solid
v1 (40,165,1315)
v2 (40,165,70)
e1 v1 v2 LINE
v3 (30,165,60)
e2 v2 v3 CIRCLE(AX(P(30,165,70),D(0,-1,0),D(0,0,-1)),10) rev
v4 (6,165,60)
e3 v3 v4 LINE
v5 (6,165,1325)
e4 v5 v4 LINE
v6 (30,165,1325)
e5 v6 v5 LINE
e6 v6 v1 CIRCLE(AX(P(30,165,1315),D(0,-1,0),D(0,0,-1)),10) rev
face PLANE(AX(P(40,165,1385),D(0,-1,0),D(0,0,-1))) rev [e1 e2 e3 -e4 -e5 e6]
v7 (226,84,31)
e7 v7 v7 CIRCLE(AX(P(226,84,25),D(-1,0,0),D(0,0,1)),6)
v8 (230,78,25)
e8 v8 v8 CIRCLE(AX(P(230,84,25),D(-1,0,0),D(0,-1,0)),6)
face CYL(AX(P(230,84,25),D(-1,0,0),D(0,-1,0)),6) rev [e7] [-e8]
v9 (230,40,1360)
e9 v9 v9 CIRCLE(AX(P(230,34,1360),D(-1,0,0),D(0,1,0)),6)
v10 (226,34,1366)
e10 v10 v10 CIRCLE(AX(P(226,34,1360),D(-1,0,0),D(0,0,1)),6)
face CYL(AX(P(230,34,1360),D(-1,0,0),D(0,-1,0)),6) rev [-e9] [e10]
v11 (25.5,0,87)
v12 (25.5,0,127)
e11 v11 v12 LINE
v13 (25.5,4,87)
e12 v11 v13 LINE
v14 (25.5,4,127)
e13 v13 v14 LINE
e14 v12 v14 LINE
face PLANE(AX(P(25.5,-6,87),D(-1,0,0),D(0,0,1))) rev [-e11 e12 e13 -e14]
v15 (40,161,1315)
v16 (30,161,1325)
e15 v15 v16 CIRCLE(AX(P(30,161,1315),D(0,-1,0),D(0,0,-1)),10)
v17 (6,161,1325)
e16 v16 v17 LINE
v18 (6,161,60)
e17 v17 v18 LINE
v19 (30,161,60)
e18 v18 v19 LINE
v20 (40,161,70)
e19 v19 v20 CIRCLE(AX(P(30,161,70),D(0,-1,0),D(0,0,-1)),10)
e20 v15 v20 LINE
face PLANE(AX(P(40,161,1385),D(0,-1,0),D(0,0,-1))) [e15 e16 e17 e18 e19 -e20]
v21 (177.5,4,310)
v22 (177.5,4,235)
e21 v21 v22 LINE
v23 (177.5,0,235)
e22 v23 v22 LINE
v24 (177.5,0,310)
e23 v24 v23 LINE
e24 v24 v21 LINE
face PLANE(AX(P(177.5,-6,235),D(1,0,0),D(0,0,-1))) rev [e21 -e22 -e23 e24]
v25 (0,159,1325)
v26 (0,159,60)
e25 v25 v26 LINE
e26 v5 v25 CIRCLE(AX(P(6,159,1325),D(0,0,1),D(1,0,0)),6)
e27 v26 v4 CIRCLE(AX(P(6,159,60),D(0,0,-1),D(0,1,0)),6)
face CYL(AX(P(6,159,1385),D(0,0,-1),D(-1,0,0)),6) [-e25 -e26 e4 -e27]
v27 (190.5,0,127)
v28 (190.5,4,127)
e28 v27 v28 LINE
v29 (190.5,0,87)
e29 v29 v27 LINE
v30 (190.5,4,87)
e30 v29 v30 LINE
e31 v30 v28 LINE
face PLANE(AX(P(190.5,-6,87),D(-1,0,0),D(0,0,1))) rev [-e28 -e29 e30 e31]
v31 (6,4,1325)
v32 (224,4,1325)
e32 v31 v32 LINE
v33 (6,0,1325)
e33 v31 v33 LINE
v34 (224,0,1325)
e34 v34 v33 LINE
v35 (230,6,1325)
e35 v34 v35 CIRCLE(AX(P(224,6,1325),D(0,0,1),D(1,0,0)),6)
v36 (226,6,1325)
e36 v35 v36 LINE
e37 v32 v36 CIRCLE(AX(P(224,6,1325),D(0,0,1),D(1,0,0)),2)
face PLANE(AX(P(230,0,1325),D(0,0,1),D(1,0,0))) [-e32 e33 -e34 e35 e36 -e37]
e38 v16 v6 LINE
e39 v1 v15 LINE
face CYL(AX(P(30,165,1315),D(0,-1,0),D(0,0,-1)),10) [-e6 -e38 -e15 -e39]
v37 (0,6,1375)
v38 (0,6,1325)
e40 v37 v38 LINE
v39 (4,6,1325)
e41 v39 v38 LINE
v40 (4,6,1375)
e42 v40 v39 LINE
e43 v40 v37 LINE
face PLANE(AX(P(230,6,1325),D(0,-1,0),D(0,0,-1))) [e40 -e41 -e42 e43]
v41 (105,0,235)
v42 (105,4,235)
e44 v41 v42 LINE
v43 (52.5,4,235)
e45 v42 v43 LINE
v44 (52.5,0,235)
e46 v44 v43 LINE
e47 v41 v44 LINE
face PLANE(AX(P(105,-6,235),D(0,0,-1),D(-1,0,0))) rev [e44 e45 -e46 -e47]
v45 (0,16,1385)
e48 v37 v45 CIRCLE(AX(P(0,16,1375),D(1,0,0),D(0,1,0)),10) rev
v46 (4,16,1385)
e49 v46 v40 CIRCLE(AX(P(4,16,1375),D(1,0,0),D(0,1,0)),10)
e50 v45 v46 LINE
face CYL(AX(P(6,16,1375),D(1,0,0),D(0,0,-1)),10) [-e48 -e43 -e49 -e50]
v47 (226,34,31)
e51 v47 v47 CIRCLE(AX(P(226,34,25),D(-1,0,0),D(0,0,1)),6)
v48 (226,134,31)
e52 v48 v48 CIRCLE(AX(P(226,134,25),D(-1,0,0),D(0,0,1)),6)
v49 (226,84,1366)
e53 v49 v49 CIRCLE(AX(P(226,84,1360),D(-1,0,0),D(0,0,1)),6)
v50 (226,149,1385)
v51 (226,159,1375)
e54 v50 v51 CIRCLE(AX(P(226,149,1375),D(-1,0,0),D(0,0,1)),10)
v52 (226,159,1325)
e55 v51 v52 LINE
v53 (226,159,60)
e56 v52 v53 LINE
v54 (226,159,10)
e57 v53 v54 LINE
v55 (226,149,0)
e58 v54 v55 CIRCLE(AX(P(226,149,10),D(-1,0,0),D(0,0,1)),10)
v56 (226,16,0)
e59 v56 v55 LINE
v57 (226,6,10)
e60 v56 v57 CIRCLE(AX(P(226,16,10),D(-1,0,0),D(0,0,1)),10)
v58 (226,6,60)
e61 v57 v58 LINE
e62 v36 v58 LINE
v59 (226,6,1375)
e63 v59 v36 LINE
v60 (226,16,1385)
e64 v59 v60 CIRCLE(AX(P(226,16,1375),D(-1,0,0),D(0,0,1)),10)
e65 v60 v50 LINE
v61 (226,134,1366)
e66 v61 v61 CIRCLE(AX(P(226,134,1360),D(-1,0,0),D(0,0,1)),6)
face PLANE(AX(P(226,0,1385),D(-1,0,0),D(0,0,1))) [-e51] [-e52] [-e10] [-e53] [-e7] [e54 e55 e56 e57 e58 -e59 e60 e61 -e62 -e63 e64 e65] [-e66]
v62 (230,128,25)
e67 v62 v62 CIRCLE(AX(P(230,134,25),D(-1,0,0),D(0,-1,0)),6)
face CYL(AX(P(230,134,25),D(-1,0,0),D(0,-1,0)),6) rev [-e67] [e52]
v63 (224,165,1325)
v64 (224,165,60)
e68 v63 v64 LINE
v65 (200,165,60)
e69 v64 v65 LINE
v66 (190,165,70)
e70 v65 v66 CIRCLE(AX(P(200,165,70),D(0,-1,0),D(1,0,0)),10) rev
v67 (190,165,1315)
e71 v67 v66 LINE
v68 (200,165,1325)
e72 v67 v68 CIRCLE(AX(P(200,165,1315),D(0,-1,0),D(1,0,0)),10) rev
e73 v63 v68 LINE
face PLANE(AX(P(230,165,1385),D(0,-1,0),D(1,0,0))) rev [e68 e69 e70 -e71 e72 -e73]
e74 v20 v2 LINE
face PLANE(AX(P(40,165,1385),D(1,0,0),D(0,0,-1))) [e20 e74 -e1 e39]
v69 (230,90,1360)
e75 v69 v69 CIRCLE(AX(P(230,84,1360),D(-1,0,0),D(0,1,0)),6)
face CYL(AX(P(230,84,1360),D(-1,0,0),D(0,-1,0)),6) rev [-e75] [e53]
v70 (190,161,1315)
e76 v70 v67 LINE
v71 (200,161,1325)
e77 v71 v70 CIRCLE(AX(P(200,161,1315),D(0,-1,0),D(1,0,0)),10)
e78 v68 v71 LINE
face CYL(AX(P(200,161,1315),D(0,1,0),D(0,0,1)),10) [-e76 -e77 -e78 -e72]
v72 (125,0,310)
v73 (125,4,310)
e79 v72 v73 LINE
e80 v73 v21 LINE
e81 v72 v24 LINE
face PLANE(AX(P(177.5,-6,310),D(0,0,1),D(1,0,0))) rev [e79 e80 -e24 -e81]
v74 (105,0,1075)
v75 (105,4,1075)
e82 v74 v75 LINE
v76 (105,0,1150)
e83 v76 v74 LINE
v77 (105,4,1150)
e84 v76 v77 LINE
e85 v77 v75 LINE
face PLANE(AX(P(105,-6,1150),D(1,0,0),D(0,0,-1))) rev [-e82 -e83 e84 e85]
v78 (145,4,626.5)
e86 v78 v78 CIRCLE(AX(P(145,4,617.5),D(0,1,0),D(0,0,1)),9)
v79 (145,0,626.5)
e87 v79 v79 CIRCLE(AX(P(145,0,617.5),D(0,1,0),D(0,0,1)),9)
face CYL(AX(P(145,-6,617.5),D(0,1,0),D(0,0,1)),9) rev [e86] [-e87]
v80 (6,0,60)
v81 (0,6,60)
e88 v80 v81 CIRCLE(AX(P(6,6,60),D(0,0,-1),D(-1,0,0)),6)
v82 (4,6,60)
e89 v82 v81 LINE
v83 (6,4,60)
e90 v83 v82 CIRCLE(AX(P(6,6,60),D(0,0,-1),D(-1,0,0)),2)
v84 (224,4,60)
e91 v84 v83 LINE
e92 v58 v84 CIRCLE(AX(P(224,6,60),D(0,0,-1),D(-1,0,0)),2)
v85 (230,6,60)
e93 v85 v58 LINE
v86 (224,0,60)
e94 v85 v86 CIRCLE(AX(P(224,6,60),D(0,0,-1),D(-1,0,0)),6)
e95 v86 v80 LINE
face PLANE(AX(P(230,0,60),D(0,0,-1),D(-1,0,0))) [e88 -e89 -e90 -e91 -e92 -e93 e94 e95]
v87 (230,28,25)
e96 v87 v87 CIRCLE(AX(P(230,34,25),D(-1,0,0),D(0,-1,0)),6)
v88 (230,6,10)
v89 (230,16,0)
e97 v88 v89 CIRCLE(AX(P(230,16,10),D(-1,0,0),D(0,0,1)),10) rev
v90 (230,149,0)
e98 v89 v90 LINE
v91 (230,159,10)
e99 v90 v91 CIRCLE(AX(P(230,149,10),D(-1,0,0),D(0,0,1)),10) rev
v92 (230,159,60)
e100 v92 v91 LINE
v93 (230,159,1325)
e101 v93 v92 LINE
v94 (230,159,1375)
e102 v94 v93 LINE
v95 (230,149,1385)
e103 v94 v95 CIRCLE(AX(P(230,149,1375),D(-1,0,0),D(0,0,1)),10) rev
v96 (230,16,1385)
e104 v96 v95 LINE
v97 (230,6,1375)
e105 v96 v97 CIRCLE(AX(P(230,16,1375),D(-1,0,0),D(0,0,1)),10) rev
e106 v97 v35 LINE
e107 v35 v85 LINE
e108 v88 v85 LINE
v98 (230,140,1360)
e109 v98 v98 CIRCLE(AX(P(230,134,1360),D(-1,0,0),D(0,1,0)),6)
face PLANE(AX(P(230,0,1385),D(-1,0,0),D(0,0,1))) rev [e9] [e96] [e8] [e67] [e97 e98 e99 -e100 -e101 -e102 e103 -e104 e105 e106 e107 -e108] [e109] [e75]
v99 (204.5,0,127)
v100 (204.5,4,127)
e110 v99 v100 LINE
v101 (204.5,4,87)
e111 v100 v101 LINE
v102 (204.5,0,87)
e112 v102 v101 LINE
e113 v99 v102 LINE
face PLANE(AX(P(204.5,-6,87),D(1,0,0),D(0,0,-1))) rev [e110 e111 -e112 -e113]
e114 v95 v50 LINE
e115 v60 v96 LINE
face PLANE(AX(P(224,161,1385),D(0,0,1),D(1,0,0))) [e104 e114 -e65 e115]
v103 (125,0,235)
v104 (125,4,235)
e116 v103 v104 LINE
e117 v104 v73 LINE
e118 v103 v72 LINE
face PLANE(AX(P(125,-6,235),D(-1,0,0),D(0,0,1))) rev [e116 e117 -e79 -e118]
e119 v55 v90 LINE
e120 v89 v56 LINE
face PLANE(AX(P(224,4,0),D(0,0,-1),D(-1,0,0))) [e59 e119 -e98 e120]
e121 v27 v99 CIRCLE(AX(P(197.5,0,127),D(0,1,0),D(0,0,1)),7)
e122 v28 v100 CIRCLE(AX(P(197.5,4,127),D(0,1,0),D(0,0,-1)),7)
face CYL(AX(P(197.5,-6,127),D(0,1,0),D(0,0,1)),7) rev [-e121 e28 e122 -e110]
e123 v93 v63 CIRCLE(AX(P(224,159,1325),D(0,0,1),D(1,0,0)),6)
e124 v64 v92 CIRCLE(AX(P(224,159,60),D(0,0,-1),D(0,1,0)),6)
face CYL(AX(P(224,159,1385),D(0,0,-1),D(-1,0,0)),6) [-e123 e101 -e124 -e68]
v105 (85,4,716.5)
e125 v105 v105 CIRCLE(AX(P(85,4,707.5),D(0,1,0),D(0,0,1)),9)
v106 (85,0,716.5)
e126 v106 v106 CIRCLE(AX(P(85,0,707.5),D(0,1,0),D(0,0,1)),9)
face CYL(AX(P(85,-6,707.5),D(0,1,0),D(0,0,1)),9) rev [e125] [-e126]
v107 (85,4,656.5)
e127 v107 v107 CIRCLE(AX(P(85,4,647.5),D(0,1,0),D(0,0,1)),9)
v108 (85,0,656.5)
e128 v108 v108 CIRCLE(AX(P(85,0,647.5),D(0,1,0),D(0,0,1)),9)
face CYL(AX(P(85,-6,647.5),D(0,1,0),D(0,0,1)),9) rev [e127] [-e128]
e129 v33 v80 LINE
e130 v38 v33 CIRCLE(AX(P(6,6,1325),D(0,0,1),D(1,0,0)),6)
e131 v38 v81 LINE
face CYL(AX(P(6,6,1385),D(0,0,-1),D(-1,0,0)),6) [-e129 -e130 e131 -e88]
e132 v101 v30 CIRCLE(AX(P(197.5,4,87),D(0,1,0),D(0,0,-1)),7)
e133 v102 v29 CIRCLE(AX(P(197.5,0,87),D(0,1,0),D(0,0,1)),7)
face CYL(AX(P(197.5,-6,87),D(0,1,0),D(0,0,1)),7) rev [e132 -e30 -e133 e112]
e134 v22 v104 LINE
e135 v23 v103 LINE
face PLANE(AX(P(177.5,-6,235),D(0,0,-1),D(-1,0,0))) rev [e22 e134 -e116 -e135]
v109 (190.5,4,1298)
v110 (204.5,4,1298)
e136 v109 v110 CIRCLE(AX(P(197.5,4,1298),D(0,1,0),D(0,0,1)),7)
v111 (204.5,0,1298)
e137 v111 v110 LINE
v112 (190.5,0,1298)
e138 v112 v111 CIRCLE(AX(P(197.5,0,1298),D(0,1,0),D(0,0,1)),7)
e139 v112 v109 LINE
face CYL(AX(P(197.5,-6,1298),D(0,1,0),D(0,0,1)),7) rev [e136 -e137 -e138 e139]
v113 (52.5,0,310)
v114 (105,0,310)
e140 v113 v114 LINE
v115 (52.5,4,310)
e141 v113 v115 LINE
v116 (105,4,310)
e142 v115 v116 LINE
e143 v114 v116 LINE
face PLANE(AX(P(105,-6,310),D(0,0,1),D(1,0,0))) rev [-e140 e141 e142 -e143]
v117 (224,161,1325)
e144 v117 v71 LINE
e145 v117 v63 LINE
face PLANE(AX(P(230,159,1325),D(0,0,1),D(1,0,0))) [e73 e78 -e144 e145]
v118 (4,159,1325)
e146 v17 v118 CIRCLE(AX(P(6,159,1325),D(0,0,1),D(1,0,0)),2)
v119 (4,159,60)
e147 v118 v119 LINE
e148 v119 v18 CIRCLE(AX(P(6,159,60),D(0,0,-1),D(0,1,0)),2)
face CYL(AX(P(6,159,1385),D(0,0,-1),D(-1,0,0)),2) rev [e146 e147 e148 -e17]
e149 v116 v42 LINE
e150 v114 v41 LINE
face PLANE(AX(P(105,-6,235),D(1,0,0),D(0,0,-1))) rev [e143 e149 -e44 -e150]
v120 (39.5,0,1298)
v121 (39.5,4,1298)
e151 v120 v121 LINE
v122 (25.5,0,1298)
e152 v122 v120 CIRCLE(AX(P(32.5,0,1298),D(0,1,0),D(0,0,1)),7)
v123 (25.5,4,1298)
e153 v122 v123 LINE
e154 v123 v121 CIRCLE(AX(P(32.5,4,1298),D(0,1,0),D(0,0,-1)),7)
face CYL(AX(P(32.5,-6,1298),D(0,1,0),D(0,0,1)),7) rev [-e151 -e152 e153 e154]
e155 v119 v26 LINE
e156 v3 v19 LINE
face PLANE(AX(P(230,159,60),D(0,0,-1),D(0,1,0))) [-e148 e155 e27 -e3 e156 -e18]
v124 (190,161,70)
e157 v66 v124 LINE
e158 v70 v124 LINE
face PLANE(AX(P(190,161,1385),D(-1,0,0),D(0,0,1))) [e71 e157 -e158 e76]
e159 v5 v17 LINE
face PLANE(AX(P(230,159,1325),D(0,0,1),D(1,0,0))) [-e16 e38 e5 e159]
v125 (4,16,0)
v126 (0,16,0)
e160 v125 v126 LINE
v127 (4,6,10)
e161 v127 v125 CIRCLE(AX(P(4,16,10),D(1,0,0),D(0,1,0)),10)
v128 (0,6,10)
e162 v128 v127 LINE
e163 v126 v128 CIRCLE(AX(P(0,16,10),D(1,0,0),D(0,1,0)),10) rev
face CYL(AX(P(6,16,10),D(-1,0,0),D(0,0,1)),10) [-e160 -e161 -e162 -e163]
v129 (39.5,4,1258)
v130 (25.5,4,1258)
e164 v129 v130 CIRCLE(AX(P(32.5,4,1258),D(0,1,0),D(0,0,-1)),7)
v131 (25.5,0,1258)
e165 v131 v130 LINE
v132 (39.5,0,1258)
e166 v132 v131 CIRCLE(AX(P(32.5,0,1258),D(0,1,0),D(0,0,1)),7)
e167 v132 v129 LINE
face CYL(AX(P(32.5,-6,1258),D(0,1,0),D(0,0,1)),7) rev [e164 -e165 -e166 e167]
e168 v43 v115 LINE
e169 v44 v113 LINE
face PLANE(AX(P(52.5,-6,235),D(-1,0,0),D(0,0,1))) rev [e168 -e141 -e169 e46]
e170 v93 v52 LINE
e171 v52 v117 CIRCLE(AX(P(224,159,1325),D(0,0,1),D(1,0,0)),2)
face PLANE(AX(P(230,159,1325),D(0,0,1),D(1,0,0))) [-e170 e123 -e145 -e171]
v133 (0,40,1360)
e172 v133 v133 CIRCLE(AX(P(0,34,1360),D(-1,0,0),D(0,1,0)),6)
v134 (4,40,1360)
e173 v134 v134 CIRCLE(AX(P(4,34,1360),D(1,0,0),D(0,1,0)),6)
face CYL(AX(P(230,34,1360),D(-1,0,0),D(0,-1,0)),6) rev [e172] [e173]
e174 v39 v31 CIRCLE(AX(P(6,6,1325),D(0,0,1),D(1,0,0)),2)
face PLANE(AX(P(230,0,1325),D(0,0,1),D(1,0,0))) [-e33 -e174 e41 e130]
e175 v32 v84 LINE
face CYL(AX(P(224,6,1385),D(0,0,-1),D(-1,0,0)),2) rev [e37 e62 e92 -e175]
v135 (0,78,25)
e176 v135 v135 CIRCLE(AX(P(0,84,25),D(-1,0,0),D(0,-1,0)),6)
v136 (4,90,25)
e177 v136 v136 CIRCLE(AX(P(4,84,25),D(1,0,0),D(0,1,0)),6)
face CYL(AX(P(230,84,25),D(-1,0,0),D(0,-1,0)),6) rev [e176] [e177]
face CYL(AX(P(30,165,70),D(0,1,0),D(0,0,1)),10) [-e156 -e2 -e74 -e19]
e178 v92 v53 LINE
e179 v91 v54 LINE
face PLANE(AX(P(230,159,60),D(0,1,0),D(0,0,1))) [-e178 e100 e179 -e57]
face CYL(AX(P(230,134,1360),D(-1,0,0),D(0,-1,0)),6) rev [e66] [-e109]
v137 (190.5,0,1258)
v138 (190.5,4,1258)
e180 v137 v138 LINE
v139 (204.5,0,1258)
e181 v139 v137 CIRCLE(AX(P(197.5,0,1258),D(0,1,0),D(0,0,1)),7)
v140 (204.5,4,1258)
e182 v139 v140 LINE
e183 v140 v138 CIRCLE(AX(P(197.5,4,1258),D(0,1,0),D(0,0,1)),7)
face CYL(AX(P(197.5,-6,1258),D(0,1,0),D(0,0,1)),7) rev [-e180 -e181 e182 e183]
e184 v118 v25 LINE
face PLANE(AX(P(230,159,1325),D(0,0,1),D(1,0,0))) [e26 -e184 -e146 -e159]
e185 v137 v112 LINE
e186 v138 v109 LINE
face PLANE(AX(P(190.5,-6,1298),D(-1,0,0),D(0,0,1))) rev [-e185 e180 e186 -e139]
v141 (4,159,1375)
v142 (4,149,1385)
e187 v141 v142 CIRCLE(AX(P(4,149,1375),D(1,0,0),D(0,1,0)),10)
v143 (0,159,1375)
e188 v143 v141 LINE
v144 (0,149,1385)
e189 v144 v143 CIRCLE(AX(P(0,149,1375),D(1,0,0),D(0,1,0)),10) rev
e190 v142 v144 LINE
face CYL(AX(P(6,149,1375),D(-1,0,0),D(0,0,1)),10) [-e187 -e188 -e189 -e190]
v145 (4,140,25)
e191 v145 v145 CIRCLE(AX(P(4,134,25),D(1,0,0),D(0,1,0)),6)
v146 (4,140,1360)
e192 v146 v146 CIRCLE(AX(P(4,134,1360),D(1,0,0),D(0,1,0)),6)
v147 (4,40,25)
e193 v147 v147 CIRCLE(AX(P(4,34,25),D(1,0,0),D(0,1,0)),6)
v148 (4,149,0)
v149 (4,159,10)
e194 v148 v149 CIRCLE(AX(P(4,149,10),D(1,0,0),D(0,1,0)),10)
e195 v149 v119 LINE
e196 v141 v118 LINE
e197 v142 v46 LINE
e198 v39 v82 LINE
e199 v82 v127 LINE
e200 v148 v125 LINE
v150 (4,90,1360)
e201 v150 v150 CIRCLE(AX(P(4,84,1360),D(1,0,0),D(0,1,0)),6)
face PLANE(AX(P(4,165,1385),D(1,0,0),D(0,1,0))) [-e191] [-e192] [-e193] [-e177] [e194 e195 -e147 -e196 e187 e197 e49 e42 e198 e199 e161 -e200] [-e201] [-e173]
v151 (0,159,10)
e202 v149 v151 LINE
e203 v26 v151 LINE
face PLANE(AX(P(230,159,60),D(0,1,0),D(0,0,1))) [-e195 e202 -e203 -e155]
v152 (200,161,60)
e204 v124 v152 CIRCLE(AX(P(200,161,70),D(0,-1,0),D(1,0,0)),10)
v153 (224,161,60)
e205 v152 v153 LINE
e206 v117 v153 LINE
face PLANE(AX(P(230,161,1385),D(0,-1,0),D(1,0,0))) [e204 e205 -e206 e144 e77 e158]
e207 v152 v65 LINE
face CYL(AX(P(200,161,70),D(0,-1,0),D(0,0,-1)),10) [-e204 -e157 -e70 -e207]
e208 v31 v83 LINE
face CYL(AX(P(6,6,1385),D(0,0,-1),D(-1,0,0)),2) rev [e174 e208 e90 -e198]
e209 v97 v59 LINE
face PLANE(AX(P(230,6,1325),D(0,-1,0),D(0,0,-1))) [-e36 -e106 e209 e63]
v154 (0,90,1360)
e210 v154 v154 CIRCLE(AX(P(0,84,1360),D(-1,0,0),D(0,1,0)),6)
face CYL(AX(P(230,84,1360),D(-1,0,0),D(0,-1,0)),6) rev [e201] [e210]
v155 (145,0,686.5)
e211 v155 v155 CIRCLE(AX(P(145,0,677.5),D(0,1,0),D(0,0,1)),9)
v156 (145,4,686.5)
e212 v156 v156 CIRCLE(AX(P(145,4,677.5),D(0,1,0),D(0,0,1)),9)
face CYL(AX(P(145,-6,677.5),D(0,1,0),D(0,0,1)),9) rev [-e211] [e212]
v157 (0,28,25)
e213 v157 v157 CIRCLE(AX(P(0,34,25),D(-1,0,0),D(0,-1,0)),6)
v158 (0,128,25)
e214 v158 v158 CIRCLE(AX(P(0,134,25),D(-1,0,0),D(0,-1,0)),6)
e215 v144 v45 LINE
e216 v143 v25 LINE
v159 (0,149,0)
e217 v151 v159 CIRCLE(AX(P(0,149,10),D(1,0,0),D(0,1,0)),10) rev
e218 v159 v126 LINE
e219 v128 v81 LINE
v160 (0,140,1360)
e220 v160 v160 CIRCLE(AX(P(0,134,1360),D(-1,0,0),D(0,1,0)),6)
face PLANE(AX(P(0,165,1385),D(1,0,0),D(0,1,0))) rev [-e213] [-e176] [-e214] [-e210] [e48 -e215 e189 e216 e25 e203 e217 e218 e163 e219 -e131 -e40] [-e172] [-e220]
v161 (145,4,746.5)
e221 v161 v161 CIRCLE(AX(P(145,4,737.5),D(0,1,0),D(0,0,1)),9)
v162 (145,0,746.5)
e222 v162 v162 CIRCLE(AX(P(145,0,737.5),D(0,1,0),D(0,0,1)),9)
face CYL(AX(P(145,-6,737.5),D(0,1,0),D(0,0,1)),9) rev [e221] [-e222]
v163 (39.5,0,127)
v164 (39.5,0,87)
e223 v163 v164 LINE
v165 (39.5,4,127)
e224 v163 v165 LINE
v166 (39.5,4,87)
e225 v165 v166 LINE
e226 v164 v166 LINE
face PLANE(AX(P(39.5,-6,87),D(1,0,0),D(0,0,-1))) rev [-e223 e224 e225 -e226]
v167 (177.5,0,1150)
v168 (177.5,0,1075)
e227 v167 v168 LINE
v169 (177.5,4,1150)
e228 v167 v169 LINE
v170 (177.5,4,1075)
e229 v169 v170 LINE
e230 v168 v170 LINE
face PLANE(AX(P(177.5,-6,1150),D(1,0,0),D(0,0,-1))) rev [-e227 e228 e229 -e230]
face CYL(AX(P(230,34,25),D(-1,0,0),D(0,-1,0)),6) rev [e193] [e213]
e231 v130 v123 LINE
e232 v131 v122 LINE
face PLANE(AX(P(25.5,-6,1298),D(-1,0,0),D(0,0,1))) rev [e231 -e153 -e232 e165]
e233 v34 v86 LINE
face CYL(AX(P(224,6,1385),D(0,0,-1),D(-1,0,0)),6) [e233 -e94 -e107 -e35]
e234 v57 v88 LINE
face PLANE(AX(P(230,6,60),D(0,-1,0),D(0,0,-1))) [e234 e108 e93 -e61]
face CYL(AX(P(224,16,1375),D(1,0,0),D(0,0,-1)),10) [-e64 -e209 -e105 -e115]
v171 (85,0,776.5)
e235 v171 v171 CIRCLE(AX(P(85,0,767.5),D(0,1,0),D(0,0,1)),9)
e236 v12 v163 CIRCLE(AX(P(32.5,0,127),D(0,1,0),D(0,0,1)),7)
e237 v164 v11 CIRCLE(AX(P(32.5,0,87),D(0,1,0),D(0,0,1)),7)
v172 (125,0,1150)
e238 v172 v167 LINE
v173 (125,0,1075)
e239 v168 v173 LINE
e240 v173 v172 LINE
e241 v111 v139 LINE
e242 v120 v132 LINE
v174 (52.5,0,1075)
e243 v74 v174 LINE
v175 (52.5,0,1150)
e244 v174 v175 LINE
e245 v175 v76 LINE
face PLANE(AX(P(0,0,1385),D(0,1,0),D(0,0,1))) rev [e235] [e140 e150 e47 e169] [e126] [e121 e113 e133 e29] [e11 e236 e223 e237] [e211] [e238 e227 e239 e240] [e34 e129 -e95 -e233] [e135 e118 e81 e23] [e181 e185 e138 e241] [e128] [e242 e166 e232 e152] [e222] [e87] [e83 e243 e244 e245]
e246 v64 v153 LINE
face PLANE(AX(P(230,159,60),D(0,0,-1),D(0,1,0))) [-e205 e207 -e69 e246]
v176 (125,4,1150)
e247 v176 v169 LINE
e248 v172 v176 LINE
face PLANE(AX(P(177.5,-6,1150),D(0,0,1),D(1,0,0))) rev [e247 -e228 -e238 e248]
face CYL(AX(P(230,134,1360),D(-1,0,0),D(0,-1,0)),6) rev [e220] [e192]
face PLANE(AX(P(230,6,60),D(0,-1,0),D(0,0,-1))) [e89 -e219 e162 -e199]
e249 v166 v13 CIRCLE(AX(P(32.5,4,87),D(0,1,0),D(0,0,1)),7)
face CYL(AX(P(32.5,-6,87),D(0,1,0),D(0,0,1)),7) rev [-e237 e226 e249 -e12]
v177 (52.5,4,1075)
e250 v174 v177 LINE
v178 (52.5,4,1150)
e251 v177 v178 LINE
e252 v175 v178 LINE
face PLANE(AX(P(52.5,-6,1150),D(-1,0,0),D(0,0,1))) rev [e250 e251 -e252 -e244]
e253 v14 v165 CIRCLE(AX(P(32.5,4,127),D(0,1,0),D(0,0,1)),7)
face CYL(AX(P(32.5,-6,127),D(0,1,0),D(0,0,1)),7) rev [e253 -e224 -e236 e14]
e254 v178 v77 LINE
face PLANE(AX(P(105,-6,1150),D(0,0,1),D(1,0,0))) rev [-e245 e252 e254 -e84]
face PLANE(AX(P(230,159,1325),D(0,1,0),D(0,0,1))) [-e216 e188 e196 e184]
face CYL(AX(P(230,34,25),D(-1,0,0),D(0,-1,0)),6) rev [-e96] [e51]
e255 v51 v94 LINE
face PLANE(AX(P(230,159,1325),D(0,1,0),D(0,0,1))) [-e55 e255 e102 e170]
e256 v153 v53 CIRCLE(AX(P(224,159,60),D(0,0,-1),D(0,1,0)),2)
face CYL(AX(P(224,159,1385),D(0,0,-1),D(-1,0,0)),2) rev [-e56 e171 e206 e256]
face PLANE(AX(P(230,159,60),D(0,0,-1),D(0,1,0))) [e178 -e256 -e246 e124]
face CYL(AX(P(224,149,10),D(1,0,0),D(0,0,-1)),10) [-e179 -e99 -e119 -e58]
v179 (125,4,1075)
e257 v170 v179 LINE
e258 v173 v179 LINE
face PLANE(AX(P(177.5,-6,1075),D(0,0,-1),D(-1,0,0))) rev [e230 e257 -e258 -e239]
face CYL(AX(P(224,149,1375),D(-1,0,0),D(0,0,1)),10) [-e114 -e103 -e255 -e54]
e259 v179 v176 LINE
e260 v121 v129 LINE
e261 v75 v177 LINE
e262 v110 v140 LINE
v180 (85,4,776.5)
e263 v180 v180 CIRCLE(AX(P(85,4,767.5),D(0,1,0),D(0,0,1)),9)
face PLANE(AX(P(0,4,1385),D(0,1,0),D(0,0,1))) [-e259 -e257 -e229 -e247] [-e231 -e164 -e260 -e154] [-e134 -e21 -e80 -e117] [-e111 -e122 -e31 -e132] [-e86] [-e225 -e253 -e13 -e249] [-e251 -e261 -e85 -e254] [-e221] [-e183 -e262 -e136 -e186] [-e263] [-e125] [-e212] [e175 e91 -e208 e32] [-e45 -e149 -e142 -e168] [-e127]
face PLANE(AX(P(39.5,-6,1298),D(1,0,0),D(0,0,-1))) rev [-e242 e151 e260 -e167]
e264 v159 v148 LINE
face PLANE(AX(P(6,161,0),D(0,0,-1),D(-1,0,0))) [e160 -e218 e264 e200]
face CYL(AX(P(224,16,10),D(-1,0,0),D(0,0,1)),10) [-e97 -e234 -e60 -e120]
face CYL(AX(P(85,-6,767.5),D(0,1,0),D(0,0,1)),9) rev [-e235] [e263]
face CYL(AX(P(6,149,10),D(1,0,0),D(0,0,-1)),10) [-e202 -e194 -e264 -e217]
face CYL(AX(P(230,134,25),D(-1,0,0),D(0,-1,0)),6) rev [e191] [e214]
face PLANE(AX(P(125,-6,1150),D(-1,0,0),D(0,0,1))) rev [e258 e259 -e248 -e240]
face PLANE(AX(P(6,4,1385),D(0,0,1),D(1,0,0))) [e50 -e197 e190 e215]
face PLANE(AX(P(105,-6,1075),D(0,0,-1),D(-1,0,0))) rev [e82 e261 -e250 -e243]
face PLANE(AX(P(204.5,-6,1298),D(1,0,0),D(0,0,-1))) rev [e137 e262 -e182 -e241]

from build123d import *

# Parameters (mm, degrees)
BASE_FLANGE1_DEPTH = 1385
SKETCH6_W          = 60
SKETCH6_H          = 6
CUT_EXTRUDE1_DEPTH = 1414.63007891
SKETCH7_R          = 6
CUT_EXTRUDE2_DEPTH = 1414.63007891
FILLET1_R          = 10
SKETCH8_R          = 9
SKETCH8_W          = 52.5
SKETCH8_H          = 75
CUT_EXTRUDE3_DEPTH = 10


# Sheet-metal steps are written as plain solids
with BuildPart() as part:
    # Sketch1 → Base-Flange1 (new body)
    with BuildSketch(Plane.XY):
        with BuildLine():
            Line((40, 165), (6, 165))
            ThreePointArc((6, 165), (1.757359313, 163.242640687), (0, 159))
            Line((0, 159), (0, 6))
            ThreePointArc((0, 6), (1.757359313, 1.757359313), (6, 0))
            Line((6, 0), (224, 0))
            ThreePointArc((224, 0), (228.242640687, 1.757359313), (230, 6))
            Line((230, 6), (230, 159))
            ThreePointArc((230, 159), (228.242640687, 163.242640687), (224, 165))
            Line((224, 165), (190, 165))
            Line((190, 165), (190, 161))
            Line((190, 161), (224, 161))
            ThreePointArc((224, 161), (225.414213562, 160.414213562), (226, 159))
            Line((226, 159), (226, 6))
            ThreePointArc((226, 6), (225.414213562, 4.585786438), (224, 4))
            Line((224, 4), (6, 4))
            ThreePointArc((6, 4), (4.585786438, 4.585786438), (4, 6))
            Line((4, 6), (4, 159))
            ThreePointArc((4, 159), (4.585786438, 160.414213562), (6, 161))
            Line((6, 161), (40, 161))
            Line((40, 161), (40, 165))
        make_face()
    extrude(amount=BASE_FLANGE1_DEPTH)

    # Sketch6 → Cut-Extrude1 (cut, through all)
    with BuildSketch(Plane(origin=(0, 0, 0), x_dir=(0, 0, -1), z_dir=(1, 0, 0))):
        with Locations((-30, 162)):
            Rectangle(SKETCH6_W, SKETCH6_H)
        with Locations((-1355, 162)):
            Rectangle(SKETCH6_W, SKETCH6_H)
        with Locations((-1355, 3)):
            Rectangle(SKETCH6_W, SKETCH6_H)
        with Locations((-30, 3)):
            Rectangle(SKETCH6_W, SKETCH6_H)
    extrude(amount=CUT_EXTRUDE1_DEPTH, mode=Mode.SUBTRACT)

    # Sketch7 → Cut-Extrude2 (cut, through all)
    with BuildSketch(Plane.ZY):
        with Locations(Location((25, 134, 0), (0, 0, 270))):
            Circle(SKETCH7_R)
        with Locations(Location((25, 84, 0), (0, 0, 270))):
            Circle(SKETCH7_R)
        with Locations(Location((25, 34, 0), (0, 0, 270))):
            Circle(SKETCH7_R)
        with Locations((1360, 34)):
            Circle(SKETCH7_R)
        with Locations((1360, 84)):
            Circle(SKETCH7_R)
        with Locations((1360, 134)):
            Circle(SKETCH7_R)
    extrude(amount=-CUT_EXTRUDE2_DEPTH, mode=Mode.SUBTRACT)

    # Fillet1
    fillet1_edges = [part.edges().sort_by_distance(p)[0] for p in [
        (190, 163, 1325),
        (40, 163, 1325),
        (190, 163, 60),
        (40, 163, 60),
        (228, 159, 0),
        (228, 159, 1385),
        (228, 6, 0),
        (228, 6, 1385),
        (2, 6, 0),
        (2, 6, 1385),
        (2, 159, 0),
        (2, 159, 1385),
    ]]
    fillet(fillet1_edges, radius=FILLET1_R)

    # Sketch8 → Cut-Extrude3 (cut)
    with BuildSketch(Plane(origin=(0, 4, 0), x_dir=(1, 0, 0), z_dir=(0, 1, 0))):
        with Locations(Location((85, -767.5, 0), (0, 0, 270))):
            Circle(SKETCH8_R)
        with Locations(Location((145, -737.5, 0), (0, 0, 270))):
            Circle(SKETCH8_R)
        with Locations(Location((145, -677.5, 0), (0, 0, 270))):
            Circle(SKETCH8_R)
        with Locations(Location((145, -617.5, 0), (0, 0, 270))):
            Circle(SKETCH8_R)
        with Locations(Location((85, -707.5, 0), (0, 0, 270))):
            Circle(SKETCH8_R)
        with Locations(Location((85, -647.5, 0), (0, 0, 270))):
            Circle(SKETCH8_R)
        with Locations((151.25, -1112.5)):
            Rectangle(SKETCH8_W, SKETCH8_H)
        with Locations((78.75, -1112.5)):
            Rectangle(SKETCH8_W, SKETCH8_H)
        with Locations((78.75, -272.5)):
            Rectangle(SKETCH8_W, SKETCH8_H)
        with Locations((151.25, -272.5)):
            Rectangle(SKETCH8_W, SKETCH8_H)
        with BuildLine():
            Line((190.5, -1298), (190.5, -1258))
            ThreePointArc((190.5, -1258), (197.5, -1251), (204.5, -1258))
            Line((204.5, -1258), (204.5, -1298))
            ThreePointArc((204.5, -1298), (197.5, -1305), (190.5, -1298))
        make_face()
        with BuildLine():
            Line((39.5, -1298), (39.5, -1258))
            ThreePointArc((39.5, -1258), (32.5, -1251), (25.5, -1258))
            Line((25.5, -1258), (25.5, -1298))
            ThreePointArc((25.5, -1298), (32.5, -1305), (39.5, -1298))
        make_face()
        with BuildLine():
            Line((39.5, -87), (39.5, -127))
            ThreePointArc((39.5, -127), (32.5, -134), (25.5, -127))
            Line((25.5, -127), (25.5, -87))
            ThreePointArc((25.5, -87), (32.5, -80), (39.5, -87))
        make_face()
        with BuildLine():
            Line((190.5, -87), (190.5, -127))
            ThreePointArc((190.5, -127), (197.5, -134), (204.5, -127))
            Line((204.5, -127), (204.5, -87))
            ThreePointArc((204.5, -87), (197.5, -80), (190.5, -87))
        make_face()
    extrude(amount=-CUT_EXTRUDE3_DEPTH, mode=Mode.SUBTRACT)


solid = part.part
